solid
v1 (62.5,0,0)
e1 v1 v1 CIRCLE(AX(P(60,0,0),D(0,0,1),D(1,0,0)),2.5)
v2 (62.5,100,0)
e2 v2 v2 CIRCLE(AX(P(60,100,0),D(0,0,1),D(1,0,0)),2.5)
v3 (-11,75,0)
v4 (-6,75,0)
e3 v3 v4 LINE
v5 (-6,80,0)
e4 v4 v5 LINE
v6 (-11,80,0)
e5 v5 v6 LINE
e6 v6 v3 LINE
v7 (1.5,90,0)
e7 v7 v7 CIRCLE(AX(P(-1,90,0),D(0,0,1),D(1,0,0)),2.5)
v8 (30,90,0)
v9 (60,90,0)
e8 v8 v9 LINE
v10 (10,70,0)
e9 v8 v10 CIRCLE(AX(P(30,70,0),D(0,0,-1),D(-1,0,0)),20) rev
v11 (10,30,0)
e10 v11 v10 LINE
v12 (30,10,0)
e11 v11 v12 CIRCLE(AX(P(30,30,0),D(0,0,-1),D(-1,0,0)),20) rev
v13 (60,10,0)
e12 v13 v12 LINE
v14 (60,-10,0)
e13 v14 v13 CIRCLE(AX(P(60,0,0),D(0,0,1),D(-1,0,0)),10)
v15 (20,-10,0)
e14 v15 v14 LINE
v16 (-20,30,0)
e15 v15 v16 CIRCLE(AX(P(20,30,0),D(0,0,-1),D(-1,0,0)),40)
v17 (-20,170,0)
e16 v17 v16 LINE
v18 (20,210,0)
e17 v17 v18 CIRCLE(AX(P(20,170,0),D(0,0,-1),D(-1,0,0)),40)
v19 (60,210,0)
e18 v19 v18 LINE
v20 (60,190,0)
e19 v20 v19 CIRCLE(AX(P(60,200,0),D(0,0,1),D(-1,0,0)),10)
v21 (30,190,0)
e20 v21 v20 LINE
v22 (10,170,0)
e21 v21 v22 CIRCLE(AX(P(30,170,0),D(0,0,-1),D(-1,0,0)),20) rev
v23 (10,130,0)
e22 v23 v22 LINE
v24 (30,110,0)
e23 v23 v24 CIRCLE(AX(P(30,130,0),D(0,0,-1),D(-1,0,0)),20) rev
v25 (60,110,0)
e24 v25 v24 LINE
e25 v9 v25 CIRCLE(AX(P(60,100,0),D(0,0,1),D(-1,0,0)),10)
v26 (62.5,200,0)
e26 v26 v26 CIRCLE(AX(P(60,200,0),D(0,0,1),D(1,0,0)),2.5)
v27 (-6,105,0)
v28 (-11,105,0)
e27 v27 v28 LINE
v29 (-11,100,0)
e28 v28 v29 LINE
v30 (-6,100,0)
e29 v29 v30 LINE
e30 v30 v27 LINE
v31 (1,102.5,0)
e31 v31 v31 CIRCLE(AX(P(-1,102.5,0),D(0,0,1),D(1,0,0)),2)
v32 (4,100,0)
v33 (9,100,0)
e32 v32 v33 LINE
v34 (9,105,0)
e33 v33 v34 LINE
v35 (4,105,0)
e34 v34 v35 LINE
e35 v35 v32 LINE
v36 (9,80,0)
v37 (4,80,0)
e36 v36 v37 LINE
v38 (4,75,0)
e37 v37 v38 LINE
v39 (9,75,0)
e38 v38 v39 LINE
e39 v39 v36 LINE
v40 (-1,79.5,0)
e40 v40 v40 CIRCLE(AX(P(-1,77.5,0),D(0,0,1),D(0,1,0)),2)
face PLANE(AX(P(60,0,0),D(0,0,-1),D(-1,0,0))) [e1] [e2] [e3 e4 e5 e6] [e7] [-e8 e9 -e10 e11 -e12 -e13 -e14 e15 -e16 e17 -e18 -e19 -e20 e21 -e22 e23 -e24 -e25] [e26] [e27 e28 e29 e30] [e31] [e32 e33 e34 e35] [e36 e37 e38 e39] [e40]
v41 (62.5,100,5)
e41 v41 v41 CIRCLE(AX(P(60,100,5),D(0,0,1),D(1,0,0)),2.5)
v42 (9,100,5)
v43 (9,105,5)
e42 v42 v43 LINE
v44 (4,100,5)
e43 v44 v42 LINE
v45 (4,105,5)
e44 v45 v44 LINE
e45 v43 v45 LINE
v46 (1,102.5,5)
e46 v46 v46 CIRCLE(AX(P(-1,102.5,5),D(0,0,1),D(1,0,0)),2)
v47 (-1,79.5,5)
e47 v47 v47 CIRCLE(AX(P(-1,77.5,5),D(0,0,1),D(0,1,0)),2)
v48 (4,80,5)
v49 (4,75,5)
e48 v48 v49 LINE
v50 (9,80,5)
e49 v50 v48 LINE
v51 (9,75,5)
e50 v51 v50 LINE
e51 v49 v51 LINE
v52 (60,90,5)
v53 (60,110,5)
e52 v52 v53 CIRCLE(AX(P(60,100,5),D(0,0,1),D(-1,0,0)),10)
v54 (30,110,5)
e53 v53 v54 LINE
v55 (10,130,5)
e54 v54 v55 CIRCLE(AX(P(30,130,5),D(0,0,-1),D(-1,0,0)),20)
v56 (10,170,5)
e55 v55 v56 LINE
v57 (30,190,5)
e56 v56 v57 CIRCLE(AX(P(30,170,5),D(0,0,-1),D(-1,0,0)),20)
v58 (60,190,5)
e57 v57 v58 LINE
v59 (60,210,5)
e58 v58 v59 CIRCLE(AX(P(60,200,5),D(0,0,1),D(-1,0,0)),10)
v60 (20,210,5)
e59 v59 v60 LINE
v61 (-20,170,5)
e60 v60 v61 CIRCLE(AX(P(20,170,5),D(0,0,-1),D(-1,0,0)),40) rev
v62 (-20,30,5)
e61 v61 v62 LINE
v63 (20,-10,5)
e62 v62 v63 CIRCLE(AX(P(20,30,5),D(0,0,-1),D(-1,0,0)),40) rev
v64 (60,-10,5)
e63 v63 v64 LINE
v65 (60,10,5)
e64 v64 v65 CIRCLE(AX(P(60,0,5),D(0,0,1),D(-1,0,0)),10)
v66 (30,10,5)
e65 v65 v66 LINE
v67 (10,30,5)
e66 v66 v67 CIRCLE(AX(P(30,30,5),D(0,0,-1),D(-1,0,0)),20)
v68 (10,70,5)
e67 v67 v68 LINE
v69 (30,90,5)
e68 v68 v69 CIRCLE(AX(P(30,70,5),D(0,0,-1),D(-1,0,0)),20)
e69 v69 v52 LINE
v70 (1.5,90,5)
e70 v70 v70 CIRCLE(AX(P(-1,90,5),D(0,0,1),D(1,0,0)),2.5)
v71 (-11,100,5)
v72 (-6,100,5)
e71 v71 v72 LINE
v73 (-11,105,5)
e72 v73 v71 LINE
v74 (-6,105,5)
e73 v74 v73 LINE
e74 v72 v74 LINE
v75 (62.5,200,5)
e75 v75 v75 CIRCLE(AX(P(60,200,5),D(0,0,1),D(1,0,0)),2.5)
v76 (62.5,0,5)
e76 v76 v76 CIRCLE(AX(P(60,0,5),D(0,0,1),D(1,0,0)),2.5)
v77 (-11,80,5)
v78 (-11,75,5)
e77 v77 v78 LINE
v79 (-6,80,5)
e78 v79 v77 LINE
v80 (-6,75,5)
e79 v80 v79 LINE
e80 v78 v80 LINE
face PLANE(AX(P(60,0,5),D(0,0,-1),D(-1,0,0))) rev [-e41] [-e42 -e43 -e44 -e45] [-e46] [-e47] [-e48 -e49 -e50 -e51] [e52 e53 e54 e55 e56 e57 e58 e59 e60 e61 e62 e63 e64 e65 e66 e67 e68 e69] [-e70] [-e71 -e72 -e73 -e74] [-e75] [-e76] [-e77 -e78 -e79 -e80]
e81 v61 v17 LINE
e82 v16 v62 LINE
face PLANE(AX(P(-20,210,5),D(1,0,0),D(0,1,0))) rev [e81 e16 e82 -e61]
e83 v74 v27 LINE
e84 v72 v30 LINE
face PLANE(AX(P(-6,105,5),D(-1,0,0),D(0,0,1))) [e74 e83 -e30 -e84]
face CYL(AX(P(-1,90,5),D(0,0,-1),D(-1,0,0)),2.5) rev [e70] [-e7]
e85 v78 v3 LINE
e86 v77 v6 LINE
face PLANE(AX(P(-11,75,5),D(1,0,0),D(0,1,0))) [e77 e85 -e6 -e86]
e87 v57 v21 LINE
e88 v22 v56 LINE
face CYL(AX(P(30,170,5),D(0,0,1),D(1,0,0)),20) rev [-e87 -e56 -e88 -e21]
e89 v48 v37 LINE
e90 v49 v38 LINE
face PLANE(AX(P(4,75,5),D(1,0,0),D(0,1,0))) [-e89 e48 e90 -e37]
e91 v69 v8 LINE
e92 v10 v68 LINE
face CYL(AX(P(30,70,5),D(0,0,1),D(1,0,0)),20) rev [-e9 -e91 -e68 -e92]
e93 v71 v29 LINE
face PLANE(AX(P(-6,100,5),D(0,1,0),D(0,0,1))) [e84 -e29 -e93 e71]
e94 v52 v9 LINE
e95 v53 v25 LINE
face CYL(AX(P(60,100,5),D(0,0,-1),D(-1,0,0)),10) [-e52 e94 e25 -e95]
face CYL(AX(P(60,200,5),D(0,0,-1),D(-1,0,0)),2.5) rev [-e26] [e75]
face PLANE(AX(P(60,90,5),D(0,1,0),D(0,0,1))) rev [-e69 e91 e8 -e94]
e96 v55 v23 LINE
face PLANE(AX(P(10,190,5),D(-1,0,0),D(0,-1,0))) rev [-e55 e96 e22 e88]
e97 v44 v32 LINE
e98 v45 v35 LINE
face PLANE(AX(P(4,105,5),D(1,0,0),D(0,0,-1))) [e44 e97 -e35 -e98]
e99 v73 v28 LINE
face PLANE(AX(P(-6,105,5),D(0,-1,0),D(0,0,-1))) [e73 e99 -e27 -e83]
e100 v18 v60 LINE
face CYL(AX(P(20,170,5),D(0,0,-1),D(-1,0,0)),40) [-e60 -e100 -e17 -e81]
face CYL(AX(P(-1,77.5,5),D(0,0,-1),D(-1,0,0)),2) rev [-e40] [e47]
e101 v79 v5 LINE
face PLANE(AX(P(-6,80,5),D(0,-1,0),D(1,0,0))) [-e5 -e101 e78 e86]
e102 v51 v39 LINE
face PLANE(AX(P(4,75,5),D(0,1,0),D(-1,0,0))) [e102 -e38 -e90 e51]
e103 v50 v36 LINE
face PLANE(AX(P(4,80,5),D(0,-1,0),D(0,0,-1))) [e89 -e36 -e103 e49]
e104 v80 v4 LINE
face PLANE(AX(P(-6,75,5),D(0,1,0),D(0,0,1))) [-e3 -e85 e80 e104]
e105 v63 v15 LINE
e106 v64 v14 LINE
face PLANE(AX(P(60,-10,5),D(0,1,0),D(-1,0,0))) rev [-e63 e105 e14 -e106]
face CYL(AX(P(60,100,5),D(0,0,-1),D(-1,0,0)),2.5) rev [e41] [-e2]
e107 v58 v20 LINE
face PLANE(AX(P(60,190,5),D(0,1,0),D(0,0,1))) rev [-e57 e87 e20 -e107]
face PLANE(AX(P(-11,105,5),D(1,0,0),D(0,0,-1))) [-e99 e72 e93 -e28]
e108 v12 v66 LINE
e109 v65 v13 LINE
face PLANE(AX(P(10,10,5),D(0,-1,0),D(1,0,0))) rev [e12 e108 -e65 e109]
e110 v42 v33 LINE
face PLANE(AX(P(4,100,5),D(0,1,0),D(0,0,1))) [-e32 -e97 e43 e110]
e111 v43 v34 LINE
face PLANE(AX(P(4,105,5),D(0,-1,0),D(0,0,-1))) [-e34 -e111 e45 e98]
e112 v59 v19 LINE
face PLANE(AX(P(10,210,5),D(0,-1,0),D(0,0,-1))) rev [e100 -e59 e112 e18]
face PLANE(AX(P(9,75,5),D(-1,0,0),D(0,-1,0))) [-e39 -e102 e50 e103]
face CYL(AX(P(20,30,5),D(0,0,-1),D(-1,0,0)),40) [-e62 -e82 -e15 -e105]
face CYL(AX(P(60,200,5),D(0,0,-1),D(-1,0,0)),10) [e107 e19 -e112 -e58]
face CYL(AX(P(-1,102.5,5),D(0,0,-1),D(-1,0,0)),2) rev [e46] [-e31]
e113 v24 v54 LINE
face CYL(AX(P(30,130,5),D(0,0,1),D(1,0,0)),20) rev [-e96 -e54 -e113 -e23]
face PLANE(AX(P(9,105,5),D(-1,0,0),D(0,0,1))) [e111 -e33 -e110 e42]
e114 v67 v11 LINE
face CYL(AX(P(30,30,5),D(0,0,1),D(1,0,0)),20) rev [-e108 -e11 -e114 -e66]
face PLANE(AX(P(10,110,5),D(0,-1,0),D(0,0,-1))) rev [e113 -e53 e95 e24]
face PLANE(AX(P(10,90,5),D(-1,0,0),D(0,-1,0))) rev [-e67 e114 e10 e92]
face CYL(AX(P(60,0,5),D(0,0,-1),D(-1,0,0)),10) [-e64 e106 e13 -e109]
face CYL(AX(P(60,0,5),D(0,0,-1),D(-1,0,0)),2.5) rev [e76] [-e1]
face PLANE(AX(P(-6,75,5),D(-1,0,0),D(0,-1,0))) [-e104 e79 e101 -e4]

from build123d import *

# Parameters (mm, degrees)
BOSS_EXTRU_1_OUTLINE_W   = 5
BOSS_EXTRU_1_OUTLINE_H   = 5
BOSS_EXTRU_1_OUTLINE_R   = 2
BOSS_EXTRU_1_OUTLINE_R_2 = 2.5
BOSS_EXTRU_1_DEPTH       = 5
CONG_1_R                 = 20
CONG_2_R                 = 40


# Read off the part's stored shape, not the designer's step: Boss.-Extru.1
with BuildPart() as part:
    # Boss.-Extru.1 outline → Boss.-Extru.1 (new body)
    with BuildSketch(Plane.XY):
        with BuildLine():
            Line((10, 10), (10, 90))
            Line((10, 90), (60, 90))
            ThreePointArc((60, 90), (70, 100), (60, 110))
            Line((60, 110), (10, 110))
            Line((10, 110), (10, 190))
            Line((10, 190), (60, 190))
            ThreePointArc((60, 190), (70, 200), (60, 210))
            Line((60, 210), (-20, 210))
            Line((-20, 210), (-20, -10))
            Line((-20, -10), (60, -10))
            ThreePointArc((60, -10), (70, 0), (60, 10))
            Line((60, 10), (10, 10))
        make_face()
        with Locations((-8.5, 77.5)):
            Rectangle(BOSS_EXTRU_1_OUTLINE_W, BOSS_EXTRU_1_OUTLINE_H, mode=Mode.SUBTRACT)
        with Locations((-1, 77.5)):
            Circle(BOSS_EXTRU_1_OUTLINE_R, mode=Mode.SUBTRACT)
        with Locations((-1, 90)):
            Circle(BOSS_EXTRU_1_OUTLINE_R_2, mode=Mode.SUBTRACT)
        with Locations((6.5, 77.5)):
            Rectangle(BOSS_EXTRU_1_OUTLINE_W, BOSS_EXTRU_1_OUTLINE_H, mode=Mode.SUBTRACT)
        with Locations((60, 0)):
            Circle(BOSS_EXTRU_1_OUTLINE_R_2, mode=Mode.SUBTRACT)
        with Locations((-8.5, 102.5)):
            Rectangle(BOSS_EXTRU_1_OUTLINE_W, BOSS_EXTRU_1_OUTLINE_H, mode=Mode.SUBTRACT)
        with Locations((-1, 102.5)):
            Circle(BOSS_EXTRU_1_OUTLINE_R, mode=Mode.SUBTRACT)
        with Locations((6.5, 102.5)):
            Rectangle(BOSS_EXTRU_1_OUTLINE_W, BOSS_EXTRU_1_OUTLINE_H, mode=Mode.SUBTRACT)
        with Locations((60, 100)):
            Circle(BOSS_EXTRU_1_OUTLINE_R_2, mode=Mode.SUBTRACT)
        with Locations((60, 200)):
            Circle(BOSS_EXTRU_1_OUTLINE_R_2, mode=Mode.SUBTRACT)
    extrude(amount=BOSS_EXTRU_1_DEPTH)

    # Congé1
    cong_1_edges = [part.edges().sort_by_distance(p)[0] for p in [
        (10, 10, 2.5),
        (10, 190, 2.5),
        (10, 110, 2.5),
        (10, 90, 2.5),
    ]]
    fillet(cong_1_edges, radius=CONG_1_R)

    # Congé2
    cong_2_edges = [part.edges().sort_by_distance(p)[0] for p in [
        (-20, -10, 2.5),
        (-20, 210, 2.5),
    ]]
    fillet(cong_2_edges, radius=CONG_2_R)


solid = part.part
